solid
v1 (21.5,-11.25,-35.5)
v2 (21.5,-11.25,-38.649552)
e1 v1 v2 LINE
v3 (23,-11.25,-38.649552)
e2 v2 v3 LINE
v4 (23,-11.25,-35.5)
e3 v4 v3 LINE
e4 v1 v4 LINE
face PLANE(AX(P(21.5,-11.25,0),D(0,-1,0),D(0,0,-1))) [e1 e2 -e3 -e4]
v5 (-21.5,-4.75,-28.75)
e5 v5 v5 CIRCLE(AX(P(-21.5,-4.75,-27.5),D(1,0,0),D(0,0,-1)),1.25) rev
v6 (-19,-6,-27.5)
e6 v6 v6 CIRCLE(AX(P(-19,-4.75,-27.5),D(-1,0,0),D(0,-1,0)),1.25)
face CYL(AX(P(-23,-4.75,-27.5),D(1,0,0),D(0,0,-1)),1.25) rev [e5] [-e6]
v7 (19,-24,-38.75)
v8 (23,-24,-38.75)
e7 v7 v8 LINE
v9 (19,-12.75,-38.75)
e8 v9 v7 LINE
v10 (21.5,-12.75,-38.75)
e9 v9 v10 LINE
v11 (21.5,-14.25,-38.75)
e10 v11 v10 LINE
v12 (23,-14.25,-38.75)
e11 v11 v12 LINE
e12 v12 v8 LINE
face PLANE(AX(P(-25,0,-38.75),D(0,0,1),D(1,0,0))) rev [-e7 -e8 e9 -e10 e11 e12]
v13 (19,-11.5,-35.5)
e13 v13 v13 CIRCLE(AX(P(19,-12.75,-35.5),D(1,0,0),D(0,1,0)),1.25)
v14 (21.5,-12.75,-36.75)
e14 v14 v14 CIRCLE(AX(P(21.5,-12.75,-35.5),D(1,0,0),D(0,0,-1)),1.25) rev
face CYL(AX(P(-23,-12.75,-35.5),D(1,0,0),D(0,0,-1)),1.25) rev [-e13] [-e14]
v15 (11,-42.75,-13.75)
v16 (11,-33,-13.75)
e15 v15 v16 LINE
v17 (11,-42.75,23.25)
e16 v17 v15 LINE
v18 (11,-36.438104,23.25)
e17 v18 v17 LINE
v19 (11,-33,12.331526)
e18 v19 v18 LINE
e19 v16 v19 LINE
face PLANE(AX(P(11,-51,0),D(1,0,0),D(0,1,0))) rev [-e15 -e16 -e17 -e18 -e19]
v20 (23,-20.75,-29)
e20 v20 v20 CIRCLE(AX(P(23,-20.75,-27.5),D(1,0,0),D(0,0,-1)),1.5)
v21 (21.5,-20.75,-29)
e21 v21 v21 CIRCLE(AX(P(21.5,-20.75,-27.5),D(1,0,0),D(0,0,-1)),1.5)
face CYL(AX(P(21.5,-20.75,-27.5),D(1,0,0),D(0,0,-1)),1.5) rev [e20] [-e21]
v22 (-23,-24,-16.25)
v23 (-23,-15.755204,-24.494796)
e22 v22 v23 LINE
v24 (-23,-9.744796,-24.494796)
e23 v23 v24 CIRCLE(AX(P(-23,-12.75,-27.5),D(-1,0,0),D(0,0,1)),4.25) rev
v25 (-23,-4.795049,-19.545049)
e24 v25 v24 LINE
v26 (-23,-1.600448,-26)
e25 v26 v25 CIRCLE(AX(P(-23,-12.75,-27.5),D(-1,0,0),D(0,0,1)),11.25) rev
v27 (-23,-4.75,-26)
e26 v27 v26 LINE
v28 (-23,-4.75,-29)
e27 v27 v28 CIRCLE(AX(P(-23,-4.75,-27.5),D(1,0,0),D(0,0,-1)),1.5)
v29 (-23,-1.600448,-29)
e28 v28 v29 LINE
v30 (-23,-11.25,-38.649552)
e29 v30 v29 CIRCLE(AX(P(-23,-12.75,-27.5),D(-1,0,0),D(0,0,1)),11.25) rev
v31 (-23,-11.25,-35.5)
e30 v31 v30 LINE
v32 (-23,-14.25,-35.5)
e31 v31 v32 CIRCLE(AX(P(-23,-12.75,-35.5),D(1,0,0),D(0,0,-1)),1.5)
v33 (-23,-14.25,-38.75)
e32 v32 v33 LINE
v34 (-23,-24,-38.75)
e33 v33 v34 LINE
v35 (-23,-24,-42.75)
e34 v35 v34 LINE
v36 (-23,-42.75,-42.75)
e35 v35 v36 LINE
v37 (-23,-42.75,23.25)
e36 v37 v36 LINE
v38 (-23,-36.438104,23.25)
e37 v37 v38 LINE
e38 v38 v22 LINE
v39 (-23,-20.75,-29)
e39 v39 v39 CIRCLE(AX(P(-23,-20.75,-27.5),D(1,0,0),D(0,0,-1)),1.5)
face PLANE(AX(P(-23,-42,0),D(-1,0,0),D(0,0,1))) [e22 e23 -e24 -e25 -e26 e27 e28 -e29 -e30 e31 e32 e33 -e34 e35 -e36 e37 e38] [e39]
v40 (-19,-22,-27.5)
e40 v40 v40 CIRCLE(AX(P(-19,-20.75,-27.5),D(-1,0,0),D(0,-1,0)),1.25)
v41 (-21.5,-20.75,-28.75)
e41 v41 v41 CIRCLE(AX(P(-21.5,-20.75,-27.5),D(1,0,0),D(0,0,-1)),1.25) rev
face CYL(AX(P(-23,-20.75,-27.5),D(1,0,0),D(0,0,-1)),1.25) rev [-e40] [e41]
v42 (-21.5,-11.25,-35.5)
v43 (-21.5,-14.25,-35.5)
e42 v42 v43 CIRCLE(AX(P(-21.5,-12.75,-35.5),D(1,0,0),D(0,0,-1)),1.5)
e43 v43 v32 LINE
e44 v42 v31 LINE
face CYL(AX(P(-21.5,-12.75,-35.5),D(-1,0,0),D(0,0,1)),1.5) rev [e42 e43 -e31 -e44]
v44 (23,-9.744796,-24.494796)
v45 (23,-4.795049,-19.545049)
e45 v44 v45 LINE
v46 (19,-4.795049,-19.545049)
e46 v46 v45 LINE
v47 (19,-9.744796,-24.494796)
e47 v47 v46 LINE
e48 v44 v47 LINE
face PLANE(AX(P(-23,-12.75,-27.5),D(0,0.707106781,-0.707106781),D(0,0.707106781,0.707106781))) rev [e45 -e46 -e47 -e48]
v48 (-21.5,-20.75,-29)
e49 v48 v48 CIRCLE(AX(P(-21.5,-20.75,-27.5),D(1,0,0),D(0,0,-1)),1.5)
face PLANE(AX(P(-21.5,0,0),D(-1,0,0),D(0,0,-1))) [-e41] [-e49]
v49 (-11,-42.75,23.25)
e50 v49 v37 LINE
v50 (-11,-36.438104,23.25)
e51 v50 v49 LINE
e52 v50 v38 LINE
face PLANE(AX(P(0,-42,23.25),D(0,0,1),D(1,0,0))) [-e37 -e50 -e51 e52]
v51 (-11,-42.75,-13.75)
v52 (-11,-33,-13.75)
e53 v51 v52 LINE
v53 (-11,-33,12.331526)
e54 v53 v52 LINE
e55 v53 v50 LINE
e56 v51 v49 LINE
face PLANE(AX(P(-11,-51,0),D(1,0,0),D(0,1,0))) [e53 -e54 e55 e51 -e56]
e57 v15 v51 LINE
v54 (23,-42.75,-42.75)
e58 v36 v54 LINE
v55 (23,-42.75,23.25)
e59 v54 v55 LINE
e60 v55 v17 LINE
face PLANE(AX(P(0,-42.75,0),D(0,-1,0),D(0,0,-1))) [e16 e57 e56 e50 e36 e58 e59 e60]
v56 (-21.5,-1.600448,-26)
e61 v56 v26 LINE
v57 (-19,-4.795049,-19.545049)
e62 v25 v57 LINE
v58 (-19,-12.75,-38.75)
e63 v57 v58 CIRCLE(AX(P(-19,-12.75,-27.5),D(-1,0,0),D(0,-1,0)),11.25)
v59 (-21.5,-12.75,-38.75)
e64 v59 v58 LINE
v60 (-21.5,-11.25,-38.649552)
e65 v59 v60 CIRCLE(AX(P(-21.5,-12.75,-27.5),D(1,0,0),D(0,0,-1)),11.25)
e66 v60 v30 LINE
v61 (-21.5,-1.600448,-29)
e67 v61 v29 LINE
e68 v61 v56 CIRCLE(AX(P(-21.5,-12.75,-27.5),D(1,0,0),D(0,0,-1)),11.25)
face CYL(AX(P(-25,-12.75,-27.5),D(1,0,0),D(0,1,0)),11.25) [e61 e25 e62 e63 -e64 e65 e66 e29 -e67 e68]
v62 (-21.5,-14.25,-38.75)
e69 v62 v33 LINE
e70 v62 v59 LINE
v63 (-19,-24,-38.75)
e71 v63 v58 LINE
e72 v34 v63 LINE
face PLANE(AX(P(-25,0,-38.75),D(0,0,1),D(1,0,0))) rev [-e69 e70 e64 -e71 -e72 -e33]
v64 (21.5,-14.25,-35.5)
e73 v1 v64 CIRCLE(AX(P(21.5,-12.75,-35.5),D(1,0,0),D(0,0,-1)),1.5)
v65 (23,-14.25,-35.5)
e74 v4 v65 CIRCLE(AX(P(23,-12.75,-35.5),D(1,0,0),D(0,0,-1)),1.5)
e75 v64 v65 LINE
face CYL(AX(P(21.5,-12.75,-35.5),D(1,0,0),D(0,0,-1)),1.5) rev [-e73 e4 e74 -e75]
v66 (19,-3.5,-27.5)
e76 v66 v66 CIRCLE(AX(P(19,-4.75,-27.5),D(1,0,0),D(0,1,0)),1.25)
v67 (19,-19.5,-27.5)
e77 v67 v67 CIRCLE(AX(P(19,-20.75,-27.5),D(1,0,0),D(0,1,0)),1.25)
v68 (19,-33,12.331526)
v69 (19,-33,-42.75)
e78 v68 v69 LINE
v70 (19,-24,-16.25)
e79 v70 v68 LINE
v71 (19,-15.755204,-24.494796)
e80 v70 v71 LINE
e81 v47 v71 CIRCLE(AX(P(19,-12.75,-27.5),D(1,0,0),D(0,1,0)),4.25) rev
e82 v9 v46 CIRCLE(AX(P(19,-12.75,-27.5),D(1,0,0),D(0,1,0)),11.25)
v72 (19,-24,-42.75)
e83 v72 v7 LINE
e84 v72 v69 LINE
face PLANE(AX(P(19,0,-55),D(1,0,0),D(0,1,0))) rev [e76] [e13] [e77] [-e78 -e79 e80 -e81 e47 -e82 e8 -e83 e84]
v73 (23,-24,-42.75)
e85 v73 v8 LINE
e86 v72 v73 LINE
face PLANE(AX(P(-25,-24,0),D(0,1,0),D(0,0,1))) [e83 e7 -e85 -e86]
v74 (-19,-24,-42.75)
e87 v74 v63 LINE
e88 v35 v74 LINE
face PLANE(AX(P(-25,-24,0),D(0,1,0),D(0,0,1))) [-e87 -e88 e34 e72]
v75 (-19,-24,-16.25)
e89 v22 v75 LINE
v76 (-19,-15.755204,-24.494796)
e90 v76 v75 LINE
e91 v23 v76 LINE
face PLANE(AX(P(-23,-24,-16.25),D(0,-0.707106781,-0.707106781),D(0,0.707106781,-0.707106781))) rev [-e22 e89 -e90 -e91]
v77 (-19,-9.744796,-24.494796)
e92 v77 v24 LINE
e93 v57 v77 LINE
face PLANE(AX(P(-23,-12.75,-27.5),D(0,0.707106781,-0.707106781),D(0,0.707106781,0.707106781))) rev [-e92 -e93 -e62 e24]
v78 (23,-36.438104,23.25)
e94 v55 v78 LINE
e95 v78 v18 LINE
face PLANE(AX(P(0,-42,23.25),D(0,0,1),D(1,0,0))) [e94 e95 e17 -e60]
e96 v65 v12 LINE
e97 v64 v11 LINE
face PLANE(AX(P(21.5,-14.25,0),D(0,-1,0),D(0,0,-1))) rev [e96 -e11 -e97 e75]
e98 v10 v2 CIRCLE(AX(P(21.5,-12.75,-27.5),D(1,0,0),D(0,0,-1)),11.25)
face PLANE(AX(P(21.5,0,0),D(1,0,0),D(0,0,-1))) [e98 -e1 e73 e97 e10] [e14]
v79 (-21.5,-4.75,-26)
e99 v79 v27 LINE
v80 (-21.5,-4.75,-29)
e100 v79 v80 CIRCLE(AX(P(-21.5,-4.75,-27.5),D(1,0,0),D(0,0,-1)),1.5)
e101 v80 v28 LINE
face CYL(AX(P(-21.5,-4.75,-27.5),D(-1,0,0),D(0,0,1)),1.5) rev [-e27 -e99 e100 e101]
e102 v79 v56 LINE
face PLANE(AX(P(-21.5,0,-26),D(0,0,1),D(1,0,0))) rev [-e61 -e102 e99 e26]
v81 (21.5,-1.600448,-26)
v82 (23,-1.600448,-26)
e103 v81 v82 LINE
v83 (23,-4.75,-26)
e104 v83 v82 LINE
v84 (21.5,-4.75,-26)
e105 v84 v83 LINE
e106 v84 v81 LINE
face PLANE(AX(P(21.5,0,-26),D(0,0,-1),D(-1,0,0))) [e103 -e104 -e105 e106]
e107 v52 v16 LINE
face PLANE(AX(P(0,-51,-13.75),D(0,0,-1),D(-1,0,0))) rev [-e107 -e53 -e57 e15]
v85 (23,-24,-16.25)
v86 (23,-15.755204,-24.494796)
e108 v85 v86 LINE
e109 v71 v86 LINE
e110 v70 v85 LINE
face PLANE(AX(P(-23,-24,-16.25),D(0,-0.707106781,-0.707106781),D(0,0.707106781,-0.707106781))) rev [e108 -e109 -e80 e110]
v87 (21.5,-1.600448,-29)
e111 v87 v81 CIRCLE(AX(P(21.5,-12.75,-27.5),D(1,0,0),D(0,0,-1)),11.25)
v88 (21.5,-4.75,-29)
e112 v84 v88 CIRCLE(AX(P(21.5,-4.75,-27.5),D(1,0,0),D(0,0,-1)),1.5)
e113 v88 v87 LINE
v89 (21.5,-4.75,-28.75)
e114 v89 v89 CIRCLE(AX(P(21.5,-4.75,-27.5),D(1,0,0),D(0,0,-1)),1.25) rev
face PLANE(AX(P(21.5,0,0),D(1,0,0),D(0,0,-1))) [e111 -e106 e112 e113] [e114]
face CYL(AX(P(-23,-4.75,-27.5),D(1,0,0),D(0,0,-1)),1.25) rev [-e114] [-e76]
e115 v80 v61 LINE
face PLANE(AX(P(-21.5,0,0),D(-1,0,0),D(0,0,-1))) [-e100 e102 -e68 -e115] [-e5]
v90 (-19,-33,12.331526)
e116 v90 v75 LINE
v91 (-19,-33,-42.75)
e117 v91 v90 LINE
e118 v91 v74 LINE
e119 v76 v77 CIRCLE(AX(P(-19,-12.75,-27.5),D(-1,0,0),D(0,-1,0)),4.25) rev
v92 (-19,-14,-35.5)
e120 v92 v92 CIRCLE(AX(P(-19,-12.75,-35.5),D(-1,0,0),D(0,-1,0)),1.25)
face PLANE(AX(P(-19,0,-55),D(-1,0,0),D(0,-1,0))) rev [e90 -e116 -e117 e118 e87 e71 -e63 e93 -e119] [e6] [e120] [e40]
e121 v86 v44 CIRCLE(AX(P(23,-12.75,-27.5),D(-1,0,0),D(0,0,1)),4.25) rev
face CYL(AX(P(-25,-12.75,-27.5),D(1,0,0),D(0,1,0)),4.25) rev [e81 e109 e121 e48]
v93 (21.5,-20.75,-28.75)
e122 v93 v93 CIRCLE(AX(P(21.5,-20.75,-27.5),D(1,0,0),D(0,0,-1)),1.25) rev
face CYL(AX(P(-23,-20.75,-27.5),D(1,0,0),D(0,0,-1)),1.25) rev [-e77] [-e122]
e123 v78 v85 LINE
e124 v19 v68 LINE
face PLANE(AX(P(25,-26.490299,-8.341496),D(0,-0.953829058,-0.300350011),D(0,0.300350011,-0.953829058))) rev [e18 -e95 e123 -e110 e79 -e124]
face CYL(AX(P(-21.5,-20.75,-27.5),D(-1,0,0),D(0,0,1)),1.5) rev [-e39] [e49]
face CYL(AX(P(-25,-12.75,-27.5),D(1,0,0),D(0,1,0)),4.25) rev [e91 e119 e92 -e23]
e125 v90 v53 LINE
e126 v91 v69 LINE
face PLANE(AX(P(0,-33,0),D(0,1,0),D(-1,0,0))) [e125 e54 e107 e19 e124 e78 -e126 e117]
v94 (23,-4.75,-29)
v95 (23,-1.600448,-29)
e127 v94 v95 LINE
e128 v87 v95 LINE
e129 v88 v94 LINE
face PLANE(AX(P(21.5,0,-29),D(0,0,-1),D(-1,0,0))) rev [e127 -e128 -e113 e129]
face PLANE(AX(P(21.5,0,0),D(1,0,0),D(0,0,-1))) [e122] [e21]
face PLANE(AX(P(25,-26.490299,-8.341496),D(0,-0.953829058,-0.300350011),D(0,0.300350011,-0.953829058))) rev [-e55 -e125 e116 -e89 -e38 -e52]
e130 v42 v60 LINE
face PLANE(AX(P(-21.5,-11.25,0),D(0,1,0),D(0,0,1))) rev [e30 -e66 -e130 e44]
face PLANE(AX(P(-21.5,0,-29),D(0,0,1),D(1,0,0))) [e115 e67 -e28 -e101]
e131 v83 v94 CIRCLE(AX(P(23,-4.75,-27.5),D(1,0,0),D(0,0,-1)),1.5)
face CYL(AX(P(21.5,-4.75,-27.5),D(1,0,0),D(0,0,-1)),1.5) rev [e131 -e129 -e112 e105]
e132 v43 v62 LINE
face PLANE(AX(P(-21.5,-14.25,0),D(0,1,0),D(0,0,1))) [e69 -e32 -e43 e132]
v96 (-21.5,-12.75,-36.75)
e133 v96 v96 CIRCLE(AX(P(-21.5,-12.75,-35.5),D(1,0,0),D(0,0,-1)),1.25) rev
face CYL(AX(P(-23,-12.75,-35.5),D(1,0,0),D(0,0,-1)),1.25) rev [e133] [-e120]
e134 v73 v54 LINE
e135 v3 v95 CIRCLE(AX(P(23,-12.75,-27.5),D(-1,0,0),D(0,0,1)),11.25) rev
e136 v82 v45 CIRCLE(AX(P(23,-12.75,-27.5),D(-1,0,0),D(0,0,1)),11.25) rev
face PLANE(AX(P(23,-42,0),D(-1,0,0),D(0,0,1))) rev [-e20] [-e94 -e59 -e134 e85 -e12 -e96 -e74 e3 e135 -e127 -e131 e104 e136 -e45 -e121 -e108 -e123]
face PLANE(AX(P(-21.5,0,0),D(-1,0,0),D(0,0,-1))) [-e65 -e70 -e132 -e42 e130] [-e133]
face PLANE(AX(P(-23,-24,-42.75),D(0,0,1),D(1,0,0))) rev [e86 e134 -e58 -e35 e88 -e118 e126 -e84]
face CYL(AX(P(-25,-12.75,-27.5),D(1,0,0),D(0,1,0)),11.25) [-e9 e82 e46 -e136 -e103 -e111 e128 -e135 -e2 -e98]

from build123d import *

# Parameters (mm, degrees)
SKETCH1_W                = 50
SKETCH1_H                = 170
BOSS_EXTRUDE1_DEPTH      = 55
SKETCH2_W                = 34
SKETCH2_H                = 27
CUT_EXTRUDE1_DEPTH       = 181.416185527
SKETCH3_W                = 10
SKETCH3_H                = 24
SKETCH3_R                = 4.25
SKETCH3_R_2              = 1
CUT_EXTRUDE2_DEPTH       = 186.539753153
SKETCH4_W                = 2
SKETCH4_H                = 24
CUT_EXTRUDE3_DEPTH       = 178.623196683
SKETCH5_W                = 6.25
SKETCH5_H                = 11.25
CUT_EXTRUDE4_DEPTH       = 186.539753153
SKETCH6_W                = 38
SKETCH6_H                = 10
CUT_EXTRUDE5_DEPTH       = 181.416185527
SKETCH8_W                = 13.25
SKETCH8_H                = 2.25
CUT_EXTRUDE7_DEPTH       = 186.539753153
SKETCH9_W                = 34
SKETCH9_H                = 35.25
CUT_EXTRUDE8_DEPTH       = 179.297679458
SKETCH11_W               = 13.25
SKETCH11_H               = 20.25
CUT_EXTRUDE9_DEPTH       = 184.480414486
SKETCH12_W               = 28.5
SKETCH12_H               = 15
BOSS_EXTRUDE2_DEPTH      = 8
SKETCH14_W               = 34
SKETCH14_H               = 15
SKETCH14_H_2             = 10.25
BOSS_EXTRUDE3_DEPTH      = 13.25
SKETCH16_R               = 4.5
SKETCH16_R_2             = 2.5
CUT_EXTRUDE13_DEPTH      = 8
SKETCH17_R               = 4.5
SKETCH17_W               = 55
SKETCH17_H               = 10.25
CUT_EXTRUDE15_DEPTH      = 175.384811552
SKETCH18_W               = 71.25
SKETCH18_H               = 27.5
SKETCH18_W_2             = 13.75
SKETCH18_W_3             = 16.25
BOSS_EXTRUDE4_DEPTH      = 50
SKETCH19_W               = 38
SKETCH19_H               = 7
CUT_EXTRUDE16_DEPTH      = 152.25227271
SKETCH20_W               = 57.5
SKETCH20_H               = 27.5
CUT_EXTRUDE17_DEPTH      = 102.137591923
CUT_EXTRUDE18_DEPTH      = 100.39221549
SKETCH22_W               = 82.5
SKETCH22_H               = 2.5
BOSS_EXTRUDE5_DEPTH      = 50
SKETCH24_W               = 22
SKETCH24_H               = 17
CUT_EXTRUDE19_DEPTH      = 101.710289941
SKETCH25_W               = 38
SKETCH25_H               = 38.136363636
CUT_EXTRUDE20_DEPTH      = 10
SKETCH27_W               = 38
SKETCH27_H               = 60.136363636
BOSS_EXTRUDE6_DEPTH      = 8.6
SKETCH29_W               = 38
SKETCH29_H               = 1.4
CUT_EXTRUDE21_DEPTH      = 85.601313414
BOSS_EXTRUDE7_DEPTH      = 50
SKETCH31_W               = 38
SKETCH31_H               = 17
CUT_EXTRUDE22_DEPTH      = 117.365802537
SKETCH32_W               = 100
SKETCH32_H               = 3
CUT_EXTRUDE23_DEPTH      = 101.710289941
SKETCH33_W               = 20
SKETCH33_H               = 10
SKETCH33_W_2             = 22
SKETCH33_H_2             = 45
CUT_EXTRUDE24_DEPTH      = 84.137311118
SKETCH34_W               = 8
SKETCH34_H               = 12
CUT_EXTRUDE25_DEPTH      = 76.0787087
BOSS_EXTRUDE8_DEPTH      = 8
SKETCH37_W               = 78
SKETCH37_H               = 9
SKETCH37_W_2             = 12
CUT_EXTRUDE27_DEPTH      = 93.48006542
FILLET1_R                = 10
CUT_EXTRUDE29_DEPTH      = 77.423572934
CUT_EXTRUDE29_DEPTH_BACK = 77.423572934
SKETCH38_W               = 2
SKETCH38_H               = 78
SKETCH38_W_2             = 46
SKETCH38_H_2             = 8
SKETCH39_W               = 22.223383748
SKETCH39_H               = 19.441332461
CUT_EXTRUDE30_DEPTH      = 86.624543794
BOSS_EXTRUDE9_DEPTH      = 0.75
CUT_EXTRUDE31_DEPTH      = 76.967920861
SKETCH44_R               = 1.25
CUT_EXTRUDE32_DEPTH      = 76.967920861
SKETCH45_R               = 1.25
SKETCH45_R_2             = 1.5
CUT_EXTRUDE33_DEPTH      = 1.5


with BuildPart() as part:
    # Sketch1 → Boss-Extrude1 (new body)
    with BuildSketch(Plane.XY):
        with Locations((0, -85)):
            Rectangle(SKETCH1_W, SKETCH1_H)
    extrude(amount=-BOSS_EXTRUDE1_DEPTH)

    # Sketch2 → Cut-Extrude1 (cut, through all)
    with BuildSketch(Plane.XY):
        with Locations((0, -13.5)):
            Rectangle(SKETCH2_W, SKETCH2_H)
    extrude(amount=-CUT_EXTRUDE1_DEPTH, mode=Mode.SUBTRACT)

    # Sketch3 → Cut-Extrude2 (cut, through all)
    with BuildSketch(Plane(origin=(25, 0, 0), x_dir=(0, 0, -1), z_dir=(1, 0, 0))):
        with Locations((50, -12)):
            Rectangle(SKETCH3_W, SKETCH3_H)
        with Locations((5, -12)):
            Rectangle(SKETCH3_W, SKETCH3_H)
        with Locations(Location((27.5, -12.75, 0), (0, 0, 90))):
            Circle(SKETCH3_R)
        with Locations(Location((35.5, -12.75, 0), (0, 0, 90))):
            Circle(SKETCH3_R_2)
        with Locations(Location((27.5, -4.75, 0), (0, 0, 90))):
            Circle(SKETCH3_R_2)
        with Locations(Location((27.5, -20.75, 0), (0, 0, 90))):
            Circle(SKETCH3_R_2)
        with Locations(Location((19.5, -12.75, 0), (0, 0, 90))):
            Circle(SKETCH3_R_2)
    extrude(amount=-CUT_EXTRUDE2_DEPTH, mode=Mode.SUBTRACT)

    # Sketch4 → Cut-Extrude3 (cut, through all)
    with BuildSketch(Plane.XY.offset(-10)):
        with Locations((-18, -12)):
            Rectangle(SKETCH4_W, SKETCH4_H)
        with Locations((18, -12)):
            Rectangle(SKETCH4_W, SKETCH4_H)
    extrude(amount=-CUT_EXTRUDE3_DEPTH, mode=Mode.SUBTRACT)

    # Sketch5 → Cut-Extrude4 (cut, through all)
    with BuildSketch(Plane(origin=(25, 0, 0), x_dir=(0, 0, -1), z_dir=(1, 0, 0))):
        with BuildLine():
            Line((45, 0), (10, 0))
            Line((10, 0), (10, -12.75))
            Line((10, -12.75), (16.25, -12.75))
            ThreePointArc((16.25, -12.75), (27.5, -1.5), (38.75, -12.75))
            Line((38.75, -12.75), (45, -12.75))
            Line((45, -12.75), (45, 0))
        make_face()
        with Locations((13.125, -18.375)):
            Rectangle(SKETCH5_W, SKETCH5_H)
        with Locations((41.875, -18.375)):
            Rectangle(SKETCH5_W, SKETCH5_H)
    extrude(amount=-CUT_EXTRUDE4_DEPTH, mode=Mode.SUBTRACT)

    # Sketch6 → Cut-Extrude5 (cut, through all)
    with BuildSketch(Plane.XY):
        with Locations((0, -29)):
            Rectangle(SKETCH6_W, SKETCH6_H)
    extrude(amount=-CUT_EXTRUDE5_DEPTH, mode=Mode.SUBTRACT)

    # Sketch8 → Cut-Extrude7 (cut, through all)
    with BuildSketch(Plane(origin=(25, 0, 0), x_dir=(0, 0, -1), z_dir=(1, 0, 0))):
        with BuildLine():
            Line((27.5, -157.5), (27.5, -132.5))
            Line((27.5, -132.5), (13.25, -132.5))
            Line((13.25, -132.5), (13.25, -167.75))
            Line((13.25, -167.75), (17.25, -167.75))
            ThreePointArc((17.25, -167.75), (20.252155493, -160.502155493), (27.5, -157.5))
        make_face()
        with BuildLine():
            Line((41.75, -167.75), (41.75, -132.5))
            Line((41.75, -132.5), (27.5, -132.5))
            Line((27.5, -132.5), (27.5, -157.5))
            ThreePointArc((27.5, -157.5), (34.747844507, -160.502155493), (37.75, -167.75))
            Line((37.75, -167.75), (41.75, -167.75))
        make_face()
        with Locations((48.375, -168.875)):
            Rectangle(SKETCH8_W, SKETCH8_H)
        with Locations((6.625, -168.875)):
            Rectangle(SKETCH8_W, SKETCH8_H)
        with BuildLine():
            Line((17.25, -167.75), (13.25, -167.75))
            Line((13.25, -167.75), (13.25, -170))
            Line((13.25, -170), (17.5, -170))
            ThreePointArc((17.5, -170), (17.31269172, -168.881923142), (17.25, -167.75))
        make_face()
        with BuildLine():
            Line((41.75, -170), (41.75, -167.75))
            Line((41.75, -167.75), (37.75, -167.75))
            ThreePointArc((37.75, -167.75), (37.68730828, -168.881923142), (37.5, -170))
            Line((37.5, -170), (41.75, -170))
        make_face()
        with BuildLine():
            Line((27.5, -167.75), (27.5, -157.5))
            ThreePointArc((27.5, -157.5), (20.252155493, -160.502155493), (17.25, -167.75))
            Line((17.25, -167.75), (27.5, -167.75))
        make_face()
        with BuildLine():
            ThreePointArc((37.75, -167.75), (34.747844507, -160.502155493), (27.5, -157.5))
            Line((27.5, -157.5), (27.5, -167.75))
            Line((27.5, -167.75), (37.75, -167.75))
        make_face()
        with BuildLine():
            Line((27.5, -170), (27.5, -167.75))
            Line((27.5, -167.75), (17.25, -167.75))
            ThreePointArc((17.25, -167.75), (17.31269172, -168.881923142), (17.5, -170))
            Line((17.5, -170), (27.5, -170))
        make_face()
        with BuildLine():
            ThreePointArc((37.5, -170), (37.68730828, -168.881923142), (37.75, -167.75))
            Line((37.75, -167.75), (27.5, -167.75))
            Line((27.5, -167.75), (27.5, -170))
            Line((27.5, -170), (37.5, -170))
        make_face()
    extrude(amount=-CUT_EXTRUDE7_DEPTH, mode=Mode.SUBTRACT)

    # Sketch9 → Cut-Extrude8 (cut, through all)
    with BuildSketch(Plane.XY):
        with Locations((0, -150.125)):
            Rectangle(SKETCH9_W, SKETCH9_H)
    extrude(amount=-CUT_EXTRUDE8_DEPTH, mode=Mode.SUBTRACT)

    # Sketch11 → Cut-Extrude9 (cut, through all)
    with BuildSketch(Plane(origin=(25, 0, 0), x_dir=(0, 0, -1), z_dir=(1, 0, 0))):
        with BuildLine():
            ThreePointArc((17.25, -167.75), (20.252155493, -160.502155493), (27.5, -157.5))
            Line((27.5, -157.5), (27.5, -147.5))
            Line((27.5, -147.5), (13.25, -147.5))
            Line((13.25, -147.5), (13.25, -167.75))
            Line((13.25, -167.75), (17.25, -167.75))
        make_face()
        with BuildLine():
            Line((27.5, -147.5), (27.5, -157.5))
            ThreePointArc((27.5, -157.5), (34.747844507, -160.502155493), (37.75, -167.75))
            Line((37.75, -167.75), (41.75, -167.75))
            Line((41.75, -167.75), (41.75, -147.5))
            Line((41.75, -147.5), (27.5, -147.5))
        make_face()
        with Locations((48.375, -157.625)):
            Rectangle(SKETCH11_W, SKETCH11_H)
        with Locations((6.625, -157.625)):
            Rectangle(SKETCH11_W, SKETCH11_H)
    extrude(amount=-CUT_EXTRUDE9_DEPTH, mode=Mode.SUBTRACT)

    # Sketch12 → Boss-Extrude2 (add)
    with BuildSketch(Plane(origin=(25, 0, 0), x_dir=(0, 0, -1), z_dir=(1, 0, 0))):
        with Locations((27.5, -140)):
            Rectangle(SKETCH12_W, SKETCH12_H)
    boss_extrude2 = extrude(amount=-BOSS_EXTRUDE2_DEPTH)

    # Mirror1: Boss-Extrude2 across plane
    add(boss_extrude2.mirror(Plane(origin=(0, 0, 0), x_dir=(0, 0, 1), z_dir=(1, 0, 0))))

    # Sketch14 → Boss-Extrude3 (add)
    with BuildSketch(Plane.XY):
        with Locations((0, -140)):
            Rectangle(SKETCH14_W, SKETCH14_H)
        with Locations((0, -152.625)):
            Rectangle(SKETCH14_W, SKETCH14_H_2)
    boss_extrude3 = extrude(amount=-BOSS_EXTRUDE3_DEPTH)

    # Mirror2: Boss-Extrude3 across plane
    add(boss_extrude3.mirror(Plane.XY.offset(-27.5)))

    # Sketch16 → Cut-Extrude13 (cut)
    # profile 1 of 3: a face of its own
    with BuildSketch(Plane(origin=(25, 0, 0), x_dir=(0, 0, -1), z_dir=(1, 0, 0))):
        with Locations(Location((16.5, -135.75, 0), (0, 0, 90))):
            Circle(SKETCH16_R)
        with Locations((16.5, -135.75)):
            Circle(SKETCH16_R_2, mode=Mode.SUBTRACT)
    # profile 2 of 3: a face of its own
    with BuildSketch(Plane(origin=(25, 0, 0), x_dir=(0, 0, -1), z_dir=(1, 0, 0))):
        with Locations((16.5, -135.75)):
            Circle(SKETCH16_R_2)
    # profile 3 of 3: a face of its own
    with BuildSketch(Plane(origin=(25, 0, 0), x_dir=(0, 0, -1), z_dir=(1, 0, 0))):
        with Locations(Location((38.5, -135.75, 0), (0, 0, 90))):
            Circle(SKETCH16_R)
    cut_extrude13 = extrude(amount=-CUT_EXTRUDE13_DEPTH, mode=Mode.SUBTRACT)

    # Mirror3: Cut-Extrude13 across plane
    add(cut_extrude13.mirror(Plane(origin=(0, 0, 0), x_dir=(0, 0, 1), z_dir=(1, 0, 0))), mode=Mode.SUBTRACT)

    # Sketch17 → Cut-Extrude15 (cut, through all)
    # profile 1 of 4: a face of its own
    with BuildSketch(Plane(origin=(25, 0, 0), x_dir=(0, 0, -1), z_dir=(1, 0, 0))):
        Polygon((55, -51.5), (27.5, -51.5), (0, -51.5), (0, -147.5), (55, -147.5), align=None)
        with Locations((16.5, -135.75)):
            Circle(SKETCH17_R, mode=Mode.SUBTRACT)
        with Locations((38.5, -135.75)):
            Circle(SKETCH17_R, mode=Mode.SUBTRACT)
    # profile 2 of 4: a face of its own
    with BuildSketch(Plane(origin=(25, 0, 0), x_dir=(0, 0, -1), z_dir=(1, 0, 0))):
        with Locations((27.5, -152.625)):
            Rectangle(SKETCH17_W, SKETCH17_H)
    # profile 3 of 4: a face of its own
    with BuildSketch(Plane(origin=(25, 0, 0), x_dir=(0, 0, -1), z_dir=(1, 0, 0))):
        with Locations((38.5, -135.75)):
            Circle(SKETCH17_R)
    # profile 4 of 4: a face of its own
    with BuildSketch(Plane(origin=(25, 0, 0), x_dir=(0, 0, -1), z_dir=(1, 0, 0))):
        with Locations((16.5, -135.75)):
            Circle(SKETCH17_R)
    extrude(amount=-CUT_EXTRUDE15_DEPTH, mode=Mode.SUBTRACT)

    # Sketch18 → Boss-Extrude4 (add)
    with BuildSketch(Plane(origin=(25, 0, 0), x_dir=(0, 0, -1), z_dir=(1, 0, 0))):
        with Locations((-35.625, -37.75)):
            Rectangle(SKETCH18_W, SKETCH18_H)
        with Locations((61.875, -37.75)):
            Rectangle(SKETCH18_W_2, SKETCH18_H)
        Polygon((38.75, -51.5), (38.75, -24), (16.25, -24), (0, -24), (0, -51.5), align=None)
        with Locations((46.875, -37.75)):
            Rectangle(SKETCH18_W_3, SKETCH18_H)
    extrude(amount=-BOSS_EXTRUDE4_DEPTH)

    # Sketch19 → Cut-Extrude16 (cut, through all)
    with BuildSketch(Plane.XY.offset(71.25)):
        with Locations((0, -27.5)):
            Rectangle(SKETCH19_W, SKETCH19_H)
    extrude(amount=-CUT_EXTRUDE16_DEPTH, mode=Mode.SUBTRACT)

    # Sketch20 → Cut-Extrude17 (cut, through all)
    with BuildSketch(Plane(origin=(25, 0, 0), x_dir=(0, 0, -1), z_dir=(1, 0, 0))):
        with Locations((-42.5, -37.75)):
            Rectangle(SKETCH20_W, SKETCH20_H)
    extrude(amount=-CUT_EXTRUDE17_DEPTH, mode=Mode.SUBTRACT)

    # Sketch21 → Cut-Extrude18 (cut, through all)
    with BuildSketch(Plane(origin=(25, 0, 0), x_dir=(0, 0, -1), z_dir=(1, 0, 0))):
        Polygon((16.25, -24), (-13.75, -51.5), (-13.75, -24), align=None)
    extrude(amount=-CUT_EXTRUDE18_DEPTH, mode=Mode.SUBTRACT)

    # Sketch22 → Boss-Extrude5 (add)
    with BuildSketch(Plane(origin=(25, 0, 0), x_dir=(0, 0, -1), z_dir=(1, 0, 0))):
        with Locations((27.5, -52.75)):
            Rectangle(SKETCH22_W, SKETCH22_H)
    extrude(amount=-BOSS_EXTRUDE5_DEPTH)

    # Sketch24 → Cut-Extrude19 (cut, through all)
    with BuildSketch(Plane(origin=(25, 0, 0), x_dir=(0, 0, -1), z_dir=(1, 0, 0))):
        with Locations((57.75, -32.5)):
            Rectangle(SKETCH24_W, SKETCH24_H)
    extrude(amount=-CUT_EXTRUDE19_DEPTH, mode=Mode.SUBTRACT)

    # Sketch25 → Cut-Extrude20 (cut)
    with BuildSketch(Plane(origin=(0, -31, 0), x_dir=(1, 0, 0), z_dir=(0, 1, 0))):
        with Locations((0, 27.681818182)):
            Rectangle(SKETCH25_W, SKETCH25_H)
    extrude(amount=-CUT_EXTRUDE20_DEPTH, mode=Mode.SUBTRACT)

    # Sketch27 → Boss-Extrude6 (add)
    with BuildSketch(Plane(origin=(0, -41, 0), x_dir=(1, 0, 0), z_dir=(0, 1, 0))):
        with Locations((0, 38.681818182)):
            Rectangle(SKETCH27_W, SKETCH27_H)
    extrude(amount=BOSS_EXTRUDE6_DEPTH)

    # Sketch29 → Cut-Extrude21 (cut, through all)
    with BuildSketch(Plane(origin=(0, 0, -8.613636364), x_dir=(-1, 0, 0), z_dir=(0, 0, -1))):
        with Locations((0, -31.7)):
            Rectangle(SKETCH29_W, SKETCH29_H)
    extrude(amount=-CUT_EXTRUDE21_DEPTH, mode=Mode.SUBTRACT)

    # Sketch30 → Boss-Extrude7 (add)
    with BuildSketch(Plane.ZY.offset(25)):
        Polygon((31.25, -38.957214173), (-16.25, -24), (-7.086363636, -32.4), (13.75, -51.5), (13.75, -53.914428346), (31.25, -53.914428346), align=None)
        Polygon((-16.25, -24), (-16.25, -32.4), (-7.086363636, -32.4), align=None)
    extrude(amount=-BOSS_EXTRUDE7_DEPTH)

    # Sketch31 → Cut-Extrude22 (cut, through all)
    with BuildSketch(Plane(origin=(0, 0, -68.75), x_dir=(-1, 0, 0), z_dir=(0, 0, -1))):
        with Locations((0, -32.5)):
            Rectangle(SKETCH31_W, SKETCH31_H)
    extrude(amount=-CUT_EXTRUDE22_DEPTH, mode=Mode.SUBTRACT)

    # Sketch32 → Cut-Extrude23 (cut, through all)
    with BuildSketch(Plane(origin=(25, 0, 0), x_dir=(0, 0, -1), z_dir=(1, 0, 0))):
        with Locations((18.75, -52.5)):
            Rectangle(SKETCH32_W, SKETCH32_H)
    extrude(amount=-CUT_EXTRUDE23_DEPTH, mode=Mode.SUBTRACT)

    # Sketch33 → Cut-Extrude24 (cut, through all)
    with BuildSketch(Plane(origin=(0, -41, 0), x_dir=(1, 0, 0), z_dir=(0, 1, 0))):
        Polygon((-10, 68.75), (-25, 68.75), (-25, 46.75), (-19, 46.75), (-10, 46.75), (-10, 58.75), align=None)
        Polygon((25, 68.75), (10, 68.75), (10, 58.75), (10, 46.75), (19, 46.75), (25, 46.75), align=None)
        with Locations((0, 63.75)):
            Rectangle(SKETCH33_W, SKETCH33_H)
        with Locations((0, -8.75)):
            Rectangle(SKETCH33_W_2, SKETCH33_H_2)
    extrude(amount=-CUT_EXTRUDE24_DEPTH, mode=Mode.SUBTRACT)

    # Sketch34 → Cut-Extrude25 (cut, through all)
    with BuildSketch(Plane(origin=(0, -41, 0), x_dir=(1, 0, 0), z_dir=(0, 1, 0))):
        with Locations((0, 52.75)):
            Rectangle(SKETCH34_W, SKETCH34_H)
    extrude(amount=-CUT_EXTRUDE25_DEPTH, mode=Mode.SUBTRACT)

    # Sketch36 → Boss-Extrude8 (add)
    with BuildSketch(Plane(origin=(0, -41, 0), x_dir=(1, 0, 0), z_dir=(0, 1, 0))):
        Polygon((4, 58.75), (4, 46.75), (-4, 46.75), (-4, 58.75), (-10, 58.75), (-10, 46.75), (-19, 46.75), (-19, -31.25), (-11, -31.25), (-11, 13.75), (11, 13.75), (11, -31.25), (19, -31.25), (19, 46.75), (10, 46.75), (10, 58.75), align=None)
    extrude(amount=BOSS_EXTRUDE8_DEPTH)

    # Sketch37 → Cut-Extrude27 (cut, through all)
    with BuildSketch(Plane(origin=(25, 0, 0), x_dir=(0, 0, -1), z_dir=(1, 0, 0))):
        with Locations((7.75, -46.5)):
            Rectangle(SKETCH37_W, SKETCH37_H)
        Polygon((-31.25, -33), (-31.25, -38.957214173), (-12.331525614, -33), align=None)
        with Locations((52.75, -46.5)):
            Rectangle(SKETCH37_W_2, SKETCH37_H)
    extrude(amount=-CUT_EXTRUDE27_DEPTH, mode=Mode.SUBTRACT)

    # Fillet1
    # the kernel refuses this fillet: 10 mm, written as the material it takes off along each edge
    with BuildSketch(Plane(origin=(20.874685928, -42, -58.75), x_dir=(0, 0, 1), z_dir=(-1, 0, 0)), Plane(origin=(34.874685928, -42, -58.75), x_dir=(0, 0, 1), z_dir=(-1, 0, 0))) as fillet1_piece_1:
        with BuildLine():
            CenterArc((9.949874371, 10), FILLET1_R, 185.739170477, 84.260829523)
            Line((0, 9), (-0.198997487, 8.98))
            ThreePointArc((-0.198997487, 8.98), (-0.2, 4.5), (-0.2, 0))
            Line((-0.2, 0), (0, -0.2))
            Line((0, -0.2), (9.949874371, -0.2))
            Line((9.949874371, -0.2), (9.949874371, 0))
        make_face()
    extrude(amount=55.749371855, mode=Mode.SUBTRACT)

    # Sketch38 → Cut-Extrude29 (cut, two sides: drawn at the far end of the back side and taken through both)
    with BuildSketch(Plane(origin=(0, 0, 0), x_dir=(1, 0, 0), z_dir=(0, 1, 0)).offset(-CUT_EXTRUDE29_DEPTH_BACK)):
        with Locations((-24, 7.75)):
            Rectangle(SKETCH38_W, SKETCH38_H)
        with Locations((24, 7.75)):
            Rectangle(SKETCH38_W, SKETCH38_H)
        with Locations((0, -27.25)):
            Rectangle(SKETCH38_W_2, SKETCH38_H_2)
    extrude(amount=CUT_EXTRUDE29_DEPTH + CUT_EXTRUDE29_DEPTH_BACK, mode=Mode.SUBTRACT)

    # Sketch39 → Cut-Extrude30 (cut, through all)
    with BuildSketch(Plane(origin=(23, 0, 0), x_dir=(0, 0, -1), z_dir=(1, 0, 0))):
        with Locations((53.861691874, -33.720666231)):
            Rectangle(SKETCH39_W, SKETCH39_H)
    extrude(amount=-CUT_EXTRUDE30_DEPTH, mode=Mode.SUBTRACT)

    # Sketch41 → Boss-Extrude9 (add)
    with BuildSketch(Plane.XZ.offset(42)):
        Polygon((-11, 23.25), (-23, 23.25), (-23, -42.75), (23, -42.75), (23, 23.25), (11, 23.25), (11, -13.75), (-11, -13.75), align=None)
    extrude(amount=BOSS_EXTRUDE9_DEPTH)

    # Sketch42 → Cut-Extrude31 (cut, through all)
    with BuildSketch(Plane(origin=(23, 0, 0), x_dir=(0, 0, -1), z_dir=(1, 0, 0))):
        Polygon((16.25, -24), (27.5, -12.75), (19.545048712, -4.795048712), (8.295048712, -16.045048712), align=None)
    extrude(amount=-CUT_EXTRUDE31_DEPTH, mode=Mode.SUBTRACT)

    # Sketch44 → Cut-Extrude32 (cut, through all)
    with BuildSketch(Plane(origin=(23, 0, 0), x_dir=(0, 0, -1), z_dir=(1, 0, 0))):
        with Locations((27.5, -4.75)):
            Circle(SKETCH44_R)
        with Locations((35.5, -12.75)):
            Circle(SKETCH44_R)
        with Locations((27.5, -20.75)):
            Circle(SKETCH44_R)
    extrude(amount=-CUT_EXTRUDE32_DEPTH, mode=Mode.SUBTRACT)

    # Sketch45 → Cut-Extrude33 (cut)
    # profile 1 of 3: a face of its own
    with BuildSketch(Plane(origin=(23, 0, 0), x_dir=(0, 0, -1), z_dir=(1, 0, 0))):
        with BuildLine():
            Line((29, -4.75), (29, -1.60044844))
            ThreePointArc((29, -1.60044844), (27.5, -1.5), (26, -1.60044844))
            Line((26, -1.60044844), (26, -4.75))
            ThreePointArc((26, -4.75), (27.5, -6.25), (29, -4.75))
        make_face()
        with Locations((27.5, -4.75)):
            Circle(SKETCH45_R, mode=Mode.SUBTRACT)
    # profile 2 of 3: a face of its own
    with BuildSketch(Plane(origin=(23, 0, 0), x_dir=(0, 0, -1), z_dir=(1, 0, 0))):
        with BuildLine():
            ThreePointArc((38.75, -12.75), (38.7248598, -11.998320233), (38.64955156, -11.25))
            Line((38.64955156, -11.25), (35.5, -11.25))
            ThreePointArc((35.5, -11.25), (34, -12.75), (35.5, -14.25))
            Line((35.5, -14.25), (38.75, -14.25))
            Line((38.75, -14.25), (38.75, -12.75))
        make_face()
        with Locations((35.5, -12.75)):
            Circle(SKETCH45_R, mode=Mode.SUBTRACT)
    # profile 3 of 3: a face of its own
    with BuildSketch(Plane(origin=(23, 0, 0), x_dir=(0, 0, -1), z_dir=(1, 0, 0))):
        with Locations((27.5, -20.75)):
            Circle(SKETCH45_R_2)
        with Locations((27.5, -20.75)):
            Circle(SKETCH45_R, mode=Mode.SUBTRACT)
    cut_extrude33 = extrude(amount=-CUT_EXTRUDE33_DEPTH, mode=Mode.SUBTRACT)

    # Mirror4: Cut-Extrude33 across plane
    add(cut_extrude33.mirror(Plane(origin=(0, 0, 0), x_dir=(0, 0, 1), z_dir=(1, 0, 0))), mode=Mode.SUBTRACT)


solid = part.part
